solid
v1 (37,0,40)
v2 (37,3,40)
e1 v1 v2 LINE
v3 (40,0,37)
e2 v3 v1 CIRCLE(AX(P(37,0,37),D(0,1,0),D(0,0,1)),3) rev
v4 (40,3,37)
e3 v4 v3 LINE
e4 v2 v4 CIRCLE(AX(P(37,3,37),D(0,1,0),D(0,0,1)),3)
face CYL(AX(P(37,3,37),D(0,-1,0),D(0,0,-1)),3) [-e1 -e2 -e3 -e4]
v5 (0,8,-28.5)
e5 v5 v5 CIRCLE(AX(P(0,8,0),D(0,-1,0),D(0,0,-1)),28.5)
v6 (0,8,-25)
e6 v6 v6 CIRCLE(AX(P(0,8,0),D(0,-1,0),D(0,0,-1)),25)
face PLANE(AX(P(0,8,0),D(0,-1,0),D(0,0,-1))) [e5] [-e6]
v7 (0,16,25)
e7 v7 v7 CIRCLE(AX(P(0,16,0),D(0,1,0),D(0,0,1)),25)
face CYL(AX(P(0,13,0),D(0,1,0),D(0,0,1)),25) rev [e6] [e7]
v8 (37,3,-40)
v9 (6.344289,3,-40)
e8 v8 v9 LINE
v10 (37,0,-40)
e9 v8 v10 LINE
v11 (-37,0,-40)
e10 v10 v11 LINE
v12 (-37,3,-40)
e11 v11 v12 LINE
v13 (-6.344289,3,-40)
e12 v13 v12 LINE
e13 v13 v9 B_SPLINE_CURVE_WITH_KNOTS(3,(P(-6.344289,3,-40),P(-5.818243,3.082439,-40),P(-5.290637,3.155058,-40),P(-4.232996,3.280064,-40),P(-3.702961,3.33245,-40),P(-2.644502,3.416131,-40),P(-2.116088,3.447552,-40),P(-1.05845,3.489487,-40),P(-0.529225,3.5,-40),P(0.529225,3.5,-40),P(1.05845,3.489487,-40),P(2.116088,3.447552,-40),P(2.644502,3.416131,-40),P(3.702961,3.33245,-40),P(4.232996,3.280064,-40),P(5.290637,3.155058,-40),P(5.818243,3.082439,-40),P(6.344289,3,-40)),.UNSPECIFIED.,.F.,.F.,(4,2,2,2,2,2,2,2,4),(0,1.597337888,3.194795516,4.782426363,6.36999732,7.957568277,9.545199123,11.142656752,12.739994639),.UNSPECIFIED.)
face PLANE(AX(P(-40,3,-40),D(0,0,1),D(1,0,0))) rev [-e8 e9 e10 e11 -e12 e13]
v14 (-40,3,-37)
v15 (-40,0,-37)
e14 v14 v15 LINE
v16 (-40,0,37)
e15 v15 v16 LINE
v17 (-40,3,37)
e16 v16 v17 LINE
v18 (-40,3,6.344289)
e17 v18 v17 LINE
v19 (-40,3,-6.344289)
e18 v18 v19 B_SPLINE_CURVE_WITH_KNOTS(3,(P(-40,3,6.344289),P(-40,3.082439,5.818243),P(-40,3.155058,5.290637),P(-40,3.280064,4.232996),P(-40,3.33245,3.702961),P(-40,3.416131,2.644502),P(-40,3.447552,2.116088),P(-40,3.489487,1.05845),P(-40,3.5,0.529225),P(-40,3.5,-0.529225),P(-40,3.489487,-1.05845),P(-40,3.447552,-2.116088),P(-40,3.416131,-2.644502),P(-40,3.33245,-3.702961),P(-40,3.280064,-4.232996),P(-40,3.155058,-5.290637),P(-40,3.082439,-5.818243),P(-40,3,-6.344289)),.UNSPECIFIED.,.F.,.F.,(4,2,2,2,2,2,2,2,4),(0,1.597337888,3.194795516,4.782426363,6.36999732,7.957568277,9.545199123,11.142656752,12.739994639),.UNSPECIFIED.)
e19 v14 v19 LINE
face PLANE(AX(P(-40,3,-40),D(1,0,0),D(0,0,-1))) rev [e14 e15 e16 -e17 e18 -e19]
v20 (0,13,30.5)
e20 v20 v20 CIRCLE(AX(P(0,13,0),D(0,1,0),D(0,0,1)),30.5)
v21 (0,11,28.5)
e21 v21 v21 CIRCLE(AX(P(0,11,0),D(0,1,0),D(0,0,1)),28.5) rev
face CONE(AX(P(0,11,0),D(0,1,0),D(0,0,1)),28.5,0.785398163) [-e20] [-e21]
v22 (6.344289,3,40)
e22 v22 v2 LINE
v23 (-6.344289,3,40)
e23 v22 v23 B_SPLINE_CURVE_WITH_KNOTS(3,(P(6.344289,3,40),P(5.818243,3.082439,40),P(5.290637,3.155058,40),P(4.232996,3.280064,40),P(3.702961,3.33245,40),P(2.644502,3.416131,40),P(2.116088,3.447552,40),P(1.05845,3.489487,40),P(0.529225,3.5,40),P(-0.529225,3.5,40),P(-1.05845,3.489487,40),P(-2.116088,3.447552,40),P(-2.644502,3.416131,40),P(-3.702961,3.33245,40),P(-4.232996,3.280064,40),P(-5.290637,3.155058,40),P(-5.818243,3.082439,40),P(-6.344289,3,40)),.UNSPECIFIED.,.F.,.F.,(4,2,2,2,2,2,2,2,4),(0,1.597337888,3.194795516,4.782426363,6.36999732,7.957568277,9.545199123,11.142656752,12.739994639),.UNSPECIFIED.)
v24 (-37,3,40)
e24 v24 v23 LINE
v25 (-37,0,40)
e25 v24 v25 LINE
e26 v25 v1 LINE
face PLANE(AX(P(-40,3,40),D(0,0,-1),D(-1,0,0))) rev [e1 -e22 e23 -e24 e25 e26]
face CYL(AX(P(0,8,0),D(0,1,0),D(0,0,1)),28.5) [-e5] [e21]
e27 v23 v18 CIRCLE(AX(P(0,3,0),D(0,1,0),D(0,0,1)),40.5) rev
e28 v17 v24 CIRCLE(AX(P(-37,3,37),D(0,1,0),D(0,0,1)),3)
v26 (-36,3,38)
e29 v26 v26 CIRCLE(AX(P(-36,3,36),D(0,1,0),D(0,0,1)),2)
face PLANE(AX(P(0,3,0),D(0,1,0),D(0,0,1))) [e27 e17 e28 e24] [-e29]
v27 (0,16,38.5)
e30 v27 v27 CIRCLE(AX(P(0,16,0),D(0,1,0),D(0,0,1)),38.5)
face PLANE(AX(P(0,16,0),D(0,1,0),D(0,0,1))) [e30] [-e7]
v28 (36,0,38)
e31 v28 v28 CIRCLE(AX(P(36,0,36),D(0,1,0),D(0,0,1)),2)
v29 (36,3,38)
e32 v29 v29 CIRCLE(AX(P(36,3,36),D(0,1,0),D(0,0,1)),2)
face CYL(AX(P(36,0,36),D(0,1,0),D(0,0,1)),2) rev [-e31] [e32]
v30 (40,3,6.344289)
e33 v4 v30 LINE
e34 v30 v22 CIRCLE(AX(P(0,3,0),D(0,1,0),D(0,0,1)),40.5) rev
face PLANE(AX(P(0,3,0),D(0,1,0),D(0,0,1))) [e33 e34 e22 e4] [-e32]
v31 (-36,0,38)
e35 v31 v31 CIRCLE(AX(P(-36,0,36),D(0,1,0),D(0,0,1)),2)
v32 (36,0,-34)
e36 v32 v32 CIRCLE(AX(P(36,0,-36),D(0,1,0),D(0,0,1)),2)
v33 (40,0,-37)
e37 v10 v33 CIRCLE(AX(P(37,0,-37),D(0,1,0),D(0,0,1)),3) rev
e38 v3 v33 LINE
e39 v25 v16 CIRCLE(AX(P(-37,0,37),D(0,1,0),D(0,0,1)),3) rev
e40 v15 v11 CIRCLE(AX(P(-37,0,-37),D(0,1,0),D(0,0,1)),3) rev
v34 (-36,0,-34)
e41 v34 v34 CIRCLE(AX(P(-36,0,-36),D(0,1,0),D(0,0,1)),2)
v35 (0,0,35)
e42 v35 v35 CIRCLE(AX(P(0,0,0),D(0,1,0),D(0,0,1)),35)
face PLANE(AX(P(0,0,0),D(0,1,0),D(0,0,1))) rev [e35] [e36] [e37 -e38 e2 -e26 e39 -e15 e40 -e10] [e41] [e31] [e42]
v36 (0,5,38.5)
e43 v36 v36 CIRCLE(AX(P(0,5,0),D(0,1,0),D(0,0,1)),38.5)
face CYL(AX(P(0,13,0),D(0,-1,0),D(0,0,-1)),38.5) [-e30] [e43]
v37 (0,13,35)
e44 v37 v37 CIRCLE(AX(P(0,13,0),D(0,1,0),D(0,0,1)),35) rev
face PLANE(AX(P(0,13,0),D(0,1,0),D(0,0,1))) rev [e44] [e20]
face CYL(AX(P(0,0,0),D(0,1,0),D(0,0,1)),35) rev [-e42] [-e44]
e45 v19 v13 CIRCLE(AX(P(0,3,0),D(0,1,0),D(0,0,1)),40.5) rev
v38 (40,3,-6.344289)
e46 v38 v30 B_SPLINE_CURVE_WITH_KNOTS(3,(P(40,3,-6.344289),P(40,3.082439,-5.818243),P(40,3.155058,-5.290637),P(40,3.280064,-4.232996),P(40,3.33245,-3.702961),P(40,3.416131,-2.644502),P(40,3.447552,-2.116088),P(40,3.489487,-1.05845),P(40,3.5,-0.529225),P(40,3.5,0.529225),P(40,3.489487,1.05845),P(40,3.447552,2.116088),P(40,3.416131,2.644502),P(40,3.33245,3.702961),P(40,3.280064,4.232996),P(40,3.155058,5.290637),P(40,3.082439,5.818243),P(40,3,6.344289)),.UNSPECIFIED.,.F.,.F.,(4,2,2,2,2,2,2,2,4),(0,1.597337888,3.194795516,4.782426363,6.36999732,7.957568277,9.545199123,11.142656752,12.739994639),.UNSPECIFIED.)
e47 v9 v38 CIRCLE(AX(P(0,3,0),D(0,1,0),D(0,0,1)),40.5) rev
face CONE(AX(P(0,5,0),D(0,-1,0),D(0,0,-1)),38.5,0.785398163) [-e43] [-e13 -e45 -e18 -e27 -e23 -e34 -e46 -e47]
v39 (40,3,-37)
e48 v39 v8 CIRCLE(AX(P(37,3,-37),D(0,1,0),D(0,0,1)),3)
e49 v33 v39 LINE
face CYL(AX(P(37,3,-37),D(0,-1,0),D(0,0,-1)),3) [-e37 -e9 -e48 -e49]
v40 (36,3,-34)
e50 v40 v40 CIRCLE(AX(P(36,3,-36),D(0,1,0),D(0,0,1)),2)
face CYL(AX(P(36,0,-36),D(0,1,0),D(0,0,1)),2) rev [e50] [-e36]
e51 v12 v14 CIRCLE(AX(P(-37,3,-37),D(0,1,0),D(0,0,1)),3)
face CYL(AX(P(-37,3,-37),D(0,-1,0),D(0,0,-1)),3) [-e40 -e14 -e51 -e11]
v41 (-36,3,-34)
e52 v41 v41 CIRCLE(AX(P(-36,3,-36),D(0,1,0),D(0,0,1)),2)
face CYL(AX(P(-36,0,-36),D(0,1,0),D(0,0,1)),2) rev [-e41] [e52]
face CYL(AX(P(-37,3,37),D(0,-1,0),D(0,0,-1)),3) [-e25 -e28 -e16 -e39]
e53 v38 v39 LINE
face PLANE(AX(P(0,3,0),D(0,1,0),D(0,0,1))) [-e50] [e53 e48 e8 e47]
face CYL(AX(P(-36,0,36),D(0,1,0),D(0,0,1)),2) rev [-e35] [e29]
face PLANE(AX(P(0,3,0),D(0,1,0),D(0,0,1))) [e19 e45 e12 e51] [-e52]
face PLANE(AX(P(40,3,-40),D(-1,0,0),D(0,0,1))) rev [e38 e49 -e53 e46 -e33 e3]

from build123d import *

# Parameters (mm, degrees)
SKETCH1_W           = 80
SKETCH1_H           = 80
BOSS_EXTRUDE1_DEPTH = 3
FILLET1_R           = 3
SKETCH2_R           = 2
CUT_EXTRUDE1_DEPTH  = 3
SKETCH3_R           = 35
CUT_EXTRUDE2_DEPTH  = 3
BOSS_EXTRUDE2_START = 10
SKETCH4_R           = 38.5
SKETCH4_R_2         = 35
BOSS_EXTRUDE2_DEPTH = 10
BOSS_EXTRUDE3_START = 3
SKETCH5_R           = 38.5
BOSS_EXTRUDE3_DEPTH = 3
SKETCH6_R           = 25
CUT_EXTRUDE3_DEPTH  = 3
SKETCH7_R           = 28.5
SKETCH7_R_2         = 25
BOSS_EXTRUDE4_DEPTH = 5
CHAMFER1_SIZE       = 2
CHAMFER2_SIZE       = 2


with BuildPart() as part:
    # Sketch1 → Boss-Extrude1 (new body)
    with BuildSketch(Plane(origin=(0, 0, 0), x_dir=(1, 0, 0), z_dir=(0, 1, 0))):
        Rectangle(SKETCH1_W, SKETCH1_H)
    extrude(amount=BOSS_EXTRUDE1_DEPTH)

    # Fillet1
    fillet1_edges = [part.edges().sort_by_distance(p)[0] for p in [
        (40, 1.5, 40),
        (-40, 1.5, 40),
        (-40, 1.5, -40),
        (40, 1.5, -40),
    ]]
    fillet(fillet1_edges, radius=FILLET1_R)

    # Sketch2 → Cut-Extrude1 (cut)
    with BuildSketch(Plane(origin=(0, 3, 0), x_dir=(1, 0, 0), z_dir=(0, 1, 0))):
        with Locations(Location((-36, 36, 0), (0, 0, 270))):
            Circle(SKETCH2_R)
        with Locations(Location((36, 36, 0), (0, 0, 270))):
            Circle(SKETCH2_R)
        with Locations(Location((-36, -36, 0), (0, 0, 270))):
            Circle(SKETCH2_R)
        with Locations(Location((36, -36, 0), (0, 0, 270))):
            Circle(SKETCH2_R)
    extrude(amount=-CUT_EXTRUDE1_DEPTH, mode=Mode.SUBTRACT)

    # Sketch3 → Cut-Extrude2 (cut)
    with BuildSketch(Plane(origin=(0, 3, 0), x_dir=(1, 0, 0), z_dir=(0, 1, 0))):
        with Locations(Location((0, 0, 0), (0, 0, 270))):
            Circle(SKETCH3_R)
    extrude(amount=-CUT_EXTRUDE2_DEPTH, mode=Mode.SUBTRACT)

    # Sketch4 → Boss-Extrude2 (add)
    with BuildSketch(Plane(origin=(0, 3, 0), x_dir=(1, 0, 0), z_dir=(0, 1, 0)).offset(BOSS_EXTRUDE2_START)):
        with Locations(Location((0, 0, 0), (0, 0, 270))):
            Circle(SKETCH4_R)
        with Locations(Location((0, 0, 0), (0, 0, 270))):
            Circle(SKETCH4_R_2, mode=Mode.SUBTRACT)
    extrude(amount=-BOSS_EXTRUDE2_DEPTH)

    # Sketch5 → Boss-Extrude3 (add)
    with BuildSketch(Plane(origin=(0, 13, 0), x_dir=(1, 0, 0), z_dir=(0, 1, 0)).offset(BOSS_EXTRUDE3_START)):
        with Locations(Location((0, 0, 0), (0, 0, 270))):
            Circle(SKETCH5_R)
    extrude(amount=-BOSS_EXTRUDE3_DEPTH)

    # Sketch6 → Cut-Extrude3 (cut)
    with BuildSketch(Plane(origin=(0, 16, 0), x_dir=(1, 0, 0), z_dir=(0, 1, 0))):
        with Locations(Location((0, 0, 0), (0, 0, 270))):
            Circle(SKETCH6_R)
    extrude(amount=-CUT_EXTRUDE3_DEPTH, mode=Mode.SUBTRACT)

    # Sketch7 → Boss-Extrude4 (add)
    with BuildSketch(Plane.XZ.offset(-13)):
        with Locations(Location((0, 0, 0), (0, 0, 90))):
            Circle(SKETCH7_R)
        with Locations(Location((0, 0, 0), (0, 0, 90))):
            Circle(SKETCH7_R_2, mode=Mode.SUBTRACT)
    extrude(amount=BOSS_EXTRUDE4_DEPTH)

    # Chamfer1
    chamfer1_edges = [part.edges().sort_by_distance(p)[0] for p in [
        (0, 13, -28.5),
    ]]
    chamfer(chamfer1_edges, length=CHAMFER1_SIZE)

    # Chamfer2
    # the kernel refuses this chamfer: 2 mm, written as the material it adds along each edge
    with BuildSketch(Plane(origin=(0, 3, 0), x_dir=(0, 0, 1), z_dir=(-1, 0, 0))) as chamfer2_piece_1_section:
        Polygon((38.5 + CHAMFER2_SIZE, 0), (38.5, CHAMFER2_SIZE), (38.5, 0), align=None)
    chamfer2_piece_1 = revolve(axis=Axis((0, 3, 0), (0, 1, 0)), mode=Mode.PRIVATE)
    chamfer2_piece_1 = split(chamfer2_piece_1, bisect_by=Plane(origin=(0, 3.942538478, -40), z_dir=(0, 0, 1)), keep=Keep.TOP, mode=Mode.PRIVATE)
    chamfer2_piece_1 = split(chamfer2_piece_1, bisect_by=Plane(origin=(-40, 3.942538478, -39.442538478), z_dir=(1, 0, 0)), keep=Keep.TOP, mode=Mode.PRIVATE)
    chamfer2_piece_1 = split(chamfer2_piece_1, bisect_by=Plane(origin=(40, 3.942538478, -39.442538478), z_dir=(-1, 0, 0)), keep=Keep.TOP, mode=Mode.PRIVATE)
    chamfer2_piece_1 = split(chamfer2_piece_1, bisect_by=Plane(origin=(0, 3.942538478, 40), z_dir=(0, 0, -1)), keep=Keep.TOP, mode=Mode.PRIVATE)
    add(chamfer2_piece_1)


solid = part.part
